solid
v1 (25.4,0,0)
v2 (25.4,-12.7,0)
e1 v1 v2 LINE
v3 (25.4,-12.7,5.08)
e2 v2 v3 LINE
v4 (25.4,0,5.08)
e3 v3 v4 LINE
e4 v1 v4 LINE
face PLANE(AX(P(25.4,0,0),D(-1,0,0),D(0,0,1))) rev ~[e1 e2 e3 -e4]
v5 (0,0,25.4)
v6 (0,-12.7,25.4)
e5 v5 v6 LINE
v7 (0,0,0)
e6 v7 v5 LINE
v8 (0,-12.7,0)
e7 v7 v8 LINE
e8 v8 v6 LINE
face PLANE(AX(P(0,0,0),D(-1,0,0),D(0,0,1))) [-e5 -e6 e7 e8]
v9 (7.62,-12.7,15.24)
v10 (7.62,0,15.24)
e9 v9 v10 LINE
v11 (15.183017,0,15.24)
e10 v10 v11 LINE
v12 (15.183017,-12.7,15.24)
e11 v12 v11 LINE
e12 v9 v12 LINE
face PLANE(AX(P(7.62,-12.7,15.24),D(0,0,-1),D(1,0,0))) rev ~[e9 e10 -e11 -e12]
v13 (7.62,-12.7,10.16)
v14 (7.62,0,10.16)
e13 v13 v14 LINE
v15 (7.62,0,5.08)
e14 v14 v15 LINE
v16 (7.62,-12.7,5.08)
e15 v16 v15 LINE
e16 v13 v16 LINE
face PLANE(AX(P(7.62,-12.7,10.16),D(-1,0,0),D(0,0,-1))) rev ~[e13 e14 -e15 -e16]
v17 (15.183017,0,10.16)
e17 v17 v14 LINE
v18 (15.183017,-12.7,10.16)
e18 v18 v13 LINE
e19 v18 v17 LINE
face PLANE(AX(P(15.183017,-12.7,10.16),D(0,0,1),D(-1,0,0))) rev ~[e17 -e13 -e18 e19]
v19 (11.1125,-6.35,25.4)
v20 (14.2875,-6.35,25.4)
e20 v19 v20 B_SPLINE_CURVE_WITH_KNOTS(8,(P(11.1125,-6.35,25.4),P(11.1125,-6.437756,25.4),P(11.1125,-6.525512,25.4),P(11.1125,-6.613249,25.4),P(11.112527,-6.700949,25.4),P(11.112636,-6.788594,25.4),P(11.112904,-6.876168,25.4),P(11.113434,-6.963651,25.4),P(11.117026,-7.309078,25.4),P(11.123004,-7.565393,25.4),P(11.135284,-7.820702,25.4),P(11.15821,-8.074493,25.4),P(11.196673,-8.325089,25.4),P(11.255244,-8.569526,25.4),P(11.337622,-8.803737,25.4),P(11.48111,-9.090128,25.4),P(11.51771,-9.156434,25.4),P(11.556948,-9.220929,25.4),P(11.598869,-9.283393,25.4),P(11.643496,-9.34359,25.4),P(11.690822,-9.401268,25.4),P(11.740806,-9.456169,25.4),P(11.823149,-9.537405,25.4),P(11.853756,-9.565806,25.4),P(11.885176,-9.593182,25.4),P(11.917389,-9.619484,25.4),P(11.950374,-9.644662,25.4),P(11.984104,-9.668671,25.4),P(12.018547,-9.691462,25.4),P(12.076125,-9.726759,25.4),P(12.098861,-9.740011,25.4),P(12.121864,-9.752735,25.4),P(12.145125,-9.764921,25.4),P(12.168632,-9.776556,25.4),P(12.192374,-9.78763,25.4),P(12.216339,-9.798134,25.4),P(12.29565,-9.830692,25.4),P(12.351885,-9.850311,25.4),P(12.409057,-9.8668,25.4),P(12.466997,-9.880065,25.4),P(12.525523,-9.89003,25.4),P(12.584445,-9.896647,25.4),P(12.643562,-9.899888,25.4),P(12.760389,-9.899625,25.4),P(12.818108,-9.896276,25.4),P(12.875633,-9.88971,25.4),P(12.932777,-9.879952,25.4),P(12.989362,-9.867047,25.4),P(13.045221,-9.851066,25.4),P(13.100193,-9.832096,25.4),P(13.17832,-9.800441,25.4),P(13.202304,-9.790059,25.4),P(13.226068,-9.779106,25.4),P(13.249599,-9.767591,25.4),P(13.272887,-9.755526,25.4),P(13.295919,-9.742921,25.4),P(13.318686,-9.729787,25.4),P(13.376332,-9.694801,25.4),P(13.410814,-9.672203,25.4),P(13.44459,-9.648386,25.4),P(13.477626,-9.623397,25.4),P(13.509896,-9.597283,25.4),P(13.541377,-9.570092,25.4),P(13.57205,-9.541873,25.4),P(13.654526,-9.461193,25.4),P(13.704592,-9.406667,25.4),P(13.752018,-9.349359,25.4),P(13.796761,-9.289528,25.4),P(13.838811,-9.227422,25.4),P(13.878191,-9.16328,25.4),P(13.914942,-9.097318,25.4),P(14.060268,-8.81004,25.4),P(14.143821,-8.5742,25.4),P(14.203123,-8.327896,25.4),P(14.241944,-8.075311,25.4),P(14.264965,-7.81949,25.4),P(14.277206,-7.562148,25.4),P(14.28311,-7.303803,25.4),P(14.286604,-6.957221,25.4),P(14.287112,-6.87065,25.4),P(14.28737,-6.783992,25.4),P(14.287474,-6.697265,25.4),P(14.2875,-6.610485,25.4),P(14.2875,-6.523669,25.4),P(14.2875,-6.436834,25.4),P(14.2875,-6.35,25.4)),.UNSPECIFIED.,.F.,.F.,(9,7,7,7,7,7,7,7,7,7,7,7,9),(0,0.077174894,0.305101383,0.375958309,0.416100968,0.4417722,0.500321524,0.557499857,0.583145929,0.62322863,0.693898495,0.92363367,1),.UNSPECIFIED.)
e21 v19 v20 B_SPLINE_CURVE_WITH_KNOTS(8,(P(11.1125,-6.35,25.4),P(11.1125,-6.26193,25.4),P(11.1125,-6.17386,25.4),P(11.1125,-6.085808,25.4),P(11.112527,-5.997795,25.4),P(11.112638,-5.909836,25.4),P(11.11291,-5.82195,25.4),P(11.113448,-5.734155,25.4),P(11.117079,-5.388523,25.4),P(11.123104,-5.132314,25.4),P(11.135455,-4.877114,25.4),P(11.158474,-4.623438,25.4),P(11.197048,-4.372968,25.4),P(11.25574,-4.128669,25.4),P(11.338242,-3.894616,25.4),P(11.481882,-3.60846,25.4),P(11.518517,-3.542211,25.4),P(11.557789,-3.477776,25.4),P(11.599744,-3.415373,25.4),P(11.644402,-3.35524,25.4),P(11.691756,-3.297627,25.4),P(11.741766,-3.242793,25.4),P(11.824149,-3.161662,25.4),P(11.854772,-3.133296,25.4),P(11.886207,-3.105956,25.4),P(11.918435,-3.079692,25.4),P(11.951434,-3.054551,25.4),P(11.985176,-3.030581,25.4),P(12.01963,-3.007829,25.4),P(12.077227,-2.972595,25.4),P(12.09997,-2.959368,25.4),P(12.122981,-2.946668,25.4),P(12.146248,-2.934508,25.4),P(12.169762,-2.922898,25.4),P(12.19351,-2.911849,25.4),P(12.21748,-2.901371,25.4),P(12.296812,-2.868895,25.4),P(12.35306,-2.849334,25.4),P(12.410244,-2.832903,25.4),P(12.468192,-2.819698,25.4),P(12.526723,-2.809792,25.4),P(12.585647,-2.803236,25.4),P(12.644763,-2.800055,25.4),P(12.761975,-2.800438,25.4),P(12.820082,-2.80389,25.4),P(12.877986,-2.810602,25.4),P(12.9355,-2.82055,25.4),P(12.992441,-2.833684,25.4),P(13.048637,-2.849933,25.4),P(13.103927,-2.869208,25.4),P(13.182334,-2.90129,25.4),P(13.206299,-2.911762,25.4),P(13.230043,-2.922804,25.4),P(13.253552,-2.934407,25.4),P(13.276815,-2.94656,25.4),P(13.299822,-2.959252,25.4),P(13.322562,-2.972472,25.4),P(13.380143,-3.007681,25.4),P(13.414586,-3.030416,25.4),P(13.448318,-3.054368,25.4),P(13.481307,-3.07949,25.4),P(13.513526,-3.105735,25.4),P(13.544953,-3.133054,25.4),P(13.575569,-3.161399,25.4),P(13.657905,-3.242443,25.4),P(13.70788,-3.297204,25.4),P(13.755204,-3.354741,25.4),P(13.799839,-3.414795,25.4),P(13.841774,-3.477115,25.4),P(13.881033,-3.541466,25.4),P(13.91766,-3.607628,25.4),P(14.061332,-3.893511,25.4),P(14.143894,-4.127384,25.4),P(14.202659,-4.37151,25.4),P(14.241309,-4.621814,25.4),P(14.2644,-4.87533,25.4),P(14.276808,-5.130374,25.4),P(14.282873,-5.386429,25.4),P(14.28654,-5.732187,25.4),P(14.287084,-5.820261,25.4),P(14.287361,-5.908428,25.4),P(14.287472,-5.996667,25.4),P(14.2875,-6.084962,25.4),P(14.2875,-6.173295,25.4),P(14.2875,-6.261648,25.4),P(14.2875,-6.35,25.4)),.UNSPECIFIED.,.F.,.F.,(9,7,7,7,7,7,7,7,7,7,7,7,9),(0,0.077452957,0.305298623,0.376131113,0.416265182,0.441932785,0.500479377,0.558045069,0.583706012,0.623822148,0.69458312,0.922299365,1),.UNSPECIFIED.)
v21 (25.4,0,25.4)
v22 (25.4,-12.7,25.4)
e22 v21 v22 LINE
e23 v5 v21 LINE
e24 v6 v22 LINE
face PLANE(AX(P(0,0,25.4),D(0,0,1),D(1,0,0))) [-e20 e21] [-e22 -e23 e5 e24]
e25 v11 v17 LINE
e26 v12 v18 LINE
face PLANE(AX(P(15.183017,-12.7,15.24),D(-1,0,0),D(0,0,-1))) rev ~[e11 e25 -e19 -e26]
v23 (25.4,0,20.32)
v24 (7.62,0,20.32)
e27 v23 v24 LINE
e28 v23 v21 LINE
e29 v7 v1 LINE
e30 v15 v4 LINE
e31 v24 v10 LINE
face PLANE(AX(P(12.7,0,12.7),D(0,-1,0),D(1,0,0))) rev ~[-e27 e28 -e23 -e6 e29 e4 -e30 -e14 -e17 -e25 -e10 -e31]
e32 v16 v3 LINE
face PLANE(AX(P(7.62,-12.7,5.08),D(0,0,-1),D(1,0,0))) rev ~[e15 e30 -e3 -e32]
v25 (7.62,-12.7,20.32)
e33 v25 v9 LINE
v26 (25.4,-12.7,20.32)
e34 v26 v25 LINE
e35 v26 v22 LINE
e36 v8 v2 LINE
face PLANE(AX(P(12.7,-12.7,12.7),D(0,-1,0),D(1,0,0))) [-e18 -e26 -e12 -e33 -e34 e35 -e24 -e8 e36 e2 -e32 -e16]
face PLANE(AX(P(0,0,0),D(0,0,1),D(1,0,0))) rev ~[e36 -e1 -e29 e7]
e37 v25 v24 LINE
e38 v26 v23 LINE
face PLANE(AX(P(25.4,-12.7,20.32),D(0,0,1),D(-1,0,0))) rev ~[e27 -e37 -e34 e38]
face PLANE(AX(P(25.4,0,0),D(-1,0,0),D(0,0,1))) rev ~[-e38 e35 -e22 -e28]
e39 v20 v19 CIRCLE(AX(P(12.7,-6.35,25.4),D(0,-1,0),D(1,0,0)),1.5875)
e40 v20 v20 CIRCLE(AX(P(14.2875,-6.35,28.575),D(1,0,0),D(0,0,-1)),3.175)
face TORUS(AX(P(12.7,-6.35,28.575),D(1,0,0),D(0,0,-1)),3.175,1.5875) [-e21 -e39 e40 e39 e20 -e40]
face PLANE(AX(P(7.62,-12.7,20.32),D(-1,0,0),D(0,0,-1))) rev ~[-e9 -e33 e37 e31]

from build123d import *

# Parameters (mm, degrees)
F0_W     = 25.4
F0_H     = 25.4
F1_DEPTH = 12.7
F3_DEPTH = 25.4
F5_R     = 1.5875


# Not quite as in the source:
# - a feature names something its author has since deleted; it is built from what else it names


with BuildPart() as f1:
    # F0 (on Front) → F1 (new body)
    with BuildSketch(Plane.XZ):
        with Locations((12.7, 12.7)):
            Rectangle(F0_W, F0_H)
    extrude(amount=F1_DEPTH)

    # F2 (on face) → F3 (cut)
    with BuildSketch(Plane.XZ.offset(12.7)):
        Polygon((25.4, 5.08), (25.4, 20.32), (7.62, 20.32), (7.62, 15.24), (15.1830166578, 15.24), (15.1830166578, 10.16), (7.62, 10.16), (7.62, 5.08), align=None)
    extrude(amount=-F3_DEPTH, mode=Mode.SUBTRACT)

    # F5 (on offset) → F6 (revolve)
    with BuildSketch(Plane.XZ.offset(6.35)):
        with Locations((12.7, 25.4)):
            Circle(F5_R)
    revolve(axis=Axis((14.955827035, -6.35, 28.575), (1, 0, 0)))


solid = f1.part
